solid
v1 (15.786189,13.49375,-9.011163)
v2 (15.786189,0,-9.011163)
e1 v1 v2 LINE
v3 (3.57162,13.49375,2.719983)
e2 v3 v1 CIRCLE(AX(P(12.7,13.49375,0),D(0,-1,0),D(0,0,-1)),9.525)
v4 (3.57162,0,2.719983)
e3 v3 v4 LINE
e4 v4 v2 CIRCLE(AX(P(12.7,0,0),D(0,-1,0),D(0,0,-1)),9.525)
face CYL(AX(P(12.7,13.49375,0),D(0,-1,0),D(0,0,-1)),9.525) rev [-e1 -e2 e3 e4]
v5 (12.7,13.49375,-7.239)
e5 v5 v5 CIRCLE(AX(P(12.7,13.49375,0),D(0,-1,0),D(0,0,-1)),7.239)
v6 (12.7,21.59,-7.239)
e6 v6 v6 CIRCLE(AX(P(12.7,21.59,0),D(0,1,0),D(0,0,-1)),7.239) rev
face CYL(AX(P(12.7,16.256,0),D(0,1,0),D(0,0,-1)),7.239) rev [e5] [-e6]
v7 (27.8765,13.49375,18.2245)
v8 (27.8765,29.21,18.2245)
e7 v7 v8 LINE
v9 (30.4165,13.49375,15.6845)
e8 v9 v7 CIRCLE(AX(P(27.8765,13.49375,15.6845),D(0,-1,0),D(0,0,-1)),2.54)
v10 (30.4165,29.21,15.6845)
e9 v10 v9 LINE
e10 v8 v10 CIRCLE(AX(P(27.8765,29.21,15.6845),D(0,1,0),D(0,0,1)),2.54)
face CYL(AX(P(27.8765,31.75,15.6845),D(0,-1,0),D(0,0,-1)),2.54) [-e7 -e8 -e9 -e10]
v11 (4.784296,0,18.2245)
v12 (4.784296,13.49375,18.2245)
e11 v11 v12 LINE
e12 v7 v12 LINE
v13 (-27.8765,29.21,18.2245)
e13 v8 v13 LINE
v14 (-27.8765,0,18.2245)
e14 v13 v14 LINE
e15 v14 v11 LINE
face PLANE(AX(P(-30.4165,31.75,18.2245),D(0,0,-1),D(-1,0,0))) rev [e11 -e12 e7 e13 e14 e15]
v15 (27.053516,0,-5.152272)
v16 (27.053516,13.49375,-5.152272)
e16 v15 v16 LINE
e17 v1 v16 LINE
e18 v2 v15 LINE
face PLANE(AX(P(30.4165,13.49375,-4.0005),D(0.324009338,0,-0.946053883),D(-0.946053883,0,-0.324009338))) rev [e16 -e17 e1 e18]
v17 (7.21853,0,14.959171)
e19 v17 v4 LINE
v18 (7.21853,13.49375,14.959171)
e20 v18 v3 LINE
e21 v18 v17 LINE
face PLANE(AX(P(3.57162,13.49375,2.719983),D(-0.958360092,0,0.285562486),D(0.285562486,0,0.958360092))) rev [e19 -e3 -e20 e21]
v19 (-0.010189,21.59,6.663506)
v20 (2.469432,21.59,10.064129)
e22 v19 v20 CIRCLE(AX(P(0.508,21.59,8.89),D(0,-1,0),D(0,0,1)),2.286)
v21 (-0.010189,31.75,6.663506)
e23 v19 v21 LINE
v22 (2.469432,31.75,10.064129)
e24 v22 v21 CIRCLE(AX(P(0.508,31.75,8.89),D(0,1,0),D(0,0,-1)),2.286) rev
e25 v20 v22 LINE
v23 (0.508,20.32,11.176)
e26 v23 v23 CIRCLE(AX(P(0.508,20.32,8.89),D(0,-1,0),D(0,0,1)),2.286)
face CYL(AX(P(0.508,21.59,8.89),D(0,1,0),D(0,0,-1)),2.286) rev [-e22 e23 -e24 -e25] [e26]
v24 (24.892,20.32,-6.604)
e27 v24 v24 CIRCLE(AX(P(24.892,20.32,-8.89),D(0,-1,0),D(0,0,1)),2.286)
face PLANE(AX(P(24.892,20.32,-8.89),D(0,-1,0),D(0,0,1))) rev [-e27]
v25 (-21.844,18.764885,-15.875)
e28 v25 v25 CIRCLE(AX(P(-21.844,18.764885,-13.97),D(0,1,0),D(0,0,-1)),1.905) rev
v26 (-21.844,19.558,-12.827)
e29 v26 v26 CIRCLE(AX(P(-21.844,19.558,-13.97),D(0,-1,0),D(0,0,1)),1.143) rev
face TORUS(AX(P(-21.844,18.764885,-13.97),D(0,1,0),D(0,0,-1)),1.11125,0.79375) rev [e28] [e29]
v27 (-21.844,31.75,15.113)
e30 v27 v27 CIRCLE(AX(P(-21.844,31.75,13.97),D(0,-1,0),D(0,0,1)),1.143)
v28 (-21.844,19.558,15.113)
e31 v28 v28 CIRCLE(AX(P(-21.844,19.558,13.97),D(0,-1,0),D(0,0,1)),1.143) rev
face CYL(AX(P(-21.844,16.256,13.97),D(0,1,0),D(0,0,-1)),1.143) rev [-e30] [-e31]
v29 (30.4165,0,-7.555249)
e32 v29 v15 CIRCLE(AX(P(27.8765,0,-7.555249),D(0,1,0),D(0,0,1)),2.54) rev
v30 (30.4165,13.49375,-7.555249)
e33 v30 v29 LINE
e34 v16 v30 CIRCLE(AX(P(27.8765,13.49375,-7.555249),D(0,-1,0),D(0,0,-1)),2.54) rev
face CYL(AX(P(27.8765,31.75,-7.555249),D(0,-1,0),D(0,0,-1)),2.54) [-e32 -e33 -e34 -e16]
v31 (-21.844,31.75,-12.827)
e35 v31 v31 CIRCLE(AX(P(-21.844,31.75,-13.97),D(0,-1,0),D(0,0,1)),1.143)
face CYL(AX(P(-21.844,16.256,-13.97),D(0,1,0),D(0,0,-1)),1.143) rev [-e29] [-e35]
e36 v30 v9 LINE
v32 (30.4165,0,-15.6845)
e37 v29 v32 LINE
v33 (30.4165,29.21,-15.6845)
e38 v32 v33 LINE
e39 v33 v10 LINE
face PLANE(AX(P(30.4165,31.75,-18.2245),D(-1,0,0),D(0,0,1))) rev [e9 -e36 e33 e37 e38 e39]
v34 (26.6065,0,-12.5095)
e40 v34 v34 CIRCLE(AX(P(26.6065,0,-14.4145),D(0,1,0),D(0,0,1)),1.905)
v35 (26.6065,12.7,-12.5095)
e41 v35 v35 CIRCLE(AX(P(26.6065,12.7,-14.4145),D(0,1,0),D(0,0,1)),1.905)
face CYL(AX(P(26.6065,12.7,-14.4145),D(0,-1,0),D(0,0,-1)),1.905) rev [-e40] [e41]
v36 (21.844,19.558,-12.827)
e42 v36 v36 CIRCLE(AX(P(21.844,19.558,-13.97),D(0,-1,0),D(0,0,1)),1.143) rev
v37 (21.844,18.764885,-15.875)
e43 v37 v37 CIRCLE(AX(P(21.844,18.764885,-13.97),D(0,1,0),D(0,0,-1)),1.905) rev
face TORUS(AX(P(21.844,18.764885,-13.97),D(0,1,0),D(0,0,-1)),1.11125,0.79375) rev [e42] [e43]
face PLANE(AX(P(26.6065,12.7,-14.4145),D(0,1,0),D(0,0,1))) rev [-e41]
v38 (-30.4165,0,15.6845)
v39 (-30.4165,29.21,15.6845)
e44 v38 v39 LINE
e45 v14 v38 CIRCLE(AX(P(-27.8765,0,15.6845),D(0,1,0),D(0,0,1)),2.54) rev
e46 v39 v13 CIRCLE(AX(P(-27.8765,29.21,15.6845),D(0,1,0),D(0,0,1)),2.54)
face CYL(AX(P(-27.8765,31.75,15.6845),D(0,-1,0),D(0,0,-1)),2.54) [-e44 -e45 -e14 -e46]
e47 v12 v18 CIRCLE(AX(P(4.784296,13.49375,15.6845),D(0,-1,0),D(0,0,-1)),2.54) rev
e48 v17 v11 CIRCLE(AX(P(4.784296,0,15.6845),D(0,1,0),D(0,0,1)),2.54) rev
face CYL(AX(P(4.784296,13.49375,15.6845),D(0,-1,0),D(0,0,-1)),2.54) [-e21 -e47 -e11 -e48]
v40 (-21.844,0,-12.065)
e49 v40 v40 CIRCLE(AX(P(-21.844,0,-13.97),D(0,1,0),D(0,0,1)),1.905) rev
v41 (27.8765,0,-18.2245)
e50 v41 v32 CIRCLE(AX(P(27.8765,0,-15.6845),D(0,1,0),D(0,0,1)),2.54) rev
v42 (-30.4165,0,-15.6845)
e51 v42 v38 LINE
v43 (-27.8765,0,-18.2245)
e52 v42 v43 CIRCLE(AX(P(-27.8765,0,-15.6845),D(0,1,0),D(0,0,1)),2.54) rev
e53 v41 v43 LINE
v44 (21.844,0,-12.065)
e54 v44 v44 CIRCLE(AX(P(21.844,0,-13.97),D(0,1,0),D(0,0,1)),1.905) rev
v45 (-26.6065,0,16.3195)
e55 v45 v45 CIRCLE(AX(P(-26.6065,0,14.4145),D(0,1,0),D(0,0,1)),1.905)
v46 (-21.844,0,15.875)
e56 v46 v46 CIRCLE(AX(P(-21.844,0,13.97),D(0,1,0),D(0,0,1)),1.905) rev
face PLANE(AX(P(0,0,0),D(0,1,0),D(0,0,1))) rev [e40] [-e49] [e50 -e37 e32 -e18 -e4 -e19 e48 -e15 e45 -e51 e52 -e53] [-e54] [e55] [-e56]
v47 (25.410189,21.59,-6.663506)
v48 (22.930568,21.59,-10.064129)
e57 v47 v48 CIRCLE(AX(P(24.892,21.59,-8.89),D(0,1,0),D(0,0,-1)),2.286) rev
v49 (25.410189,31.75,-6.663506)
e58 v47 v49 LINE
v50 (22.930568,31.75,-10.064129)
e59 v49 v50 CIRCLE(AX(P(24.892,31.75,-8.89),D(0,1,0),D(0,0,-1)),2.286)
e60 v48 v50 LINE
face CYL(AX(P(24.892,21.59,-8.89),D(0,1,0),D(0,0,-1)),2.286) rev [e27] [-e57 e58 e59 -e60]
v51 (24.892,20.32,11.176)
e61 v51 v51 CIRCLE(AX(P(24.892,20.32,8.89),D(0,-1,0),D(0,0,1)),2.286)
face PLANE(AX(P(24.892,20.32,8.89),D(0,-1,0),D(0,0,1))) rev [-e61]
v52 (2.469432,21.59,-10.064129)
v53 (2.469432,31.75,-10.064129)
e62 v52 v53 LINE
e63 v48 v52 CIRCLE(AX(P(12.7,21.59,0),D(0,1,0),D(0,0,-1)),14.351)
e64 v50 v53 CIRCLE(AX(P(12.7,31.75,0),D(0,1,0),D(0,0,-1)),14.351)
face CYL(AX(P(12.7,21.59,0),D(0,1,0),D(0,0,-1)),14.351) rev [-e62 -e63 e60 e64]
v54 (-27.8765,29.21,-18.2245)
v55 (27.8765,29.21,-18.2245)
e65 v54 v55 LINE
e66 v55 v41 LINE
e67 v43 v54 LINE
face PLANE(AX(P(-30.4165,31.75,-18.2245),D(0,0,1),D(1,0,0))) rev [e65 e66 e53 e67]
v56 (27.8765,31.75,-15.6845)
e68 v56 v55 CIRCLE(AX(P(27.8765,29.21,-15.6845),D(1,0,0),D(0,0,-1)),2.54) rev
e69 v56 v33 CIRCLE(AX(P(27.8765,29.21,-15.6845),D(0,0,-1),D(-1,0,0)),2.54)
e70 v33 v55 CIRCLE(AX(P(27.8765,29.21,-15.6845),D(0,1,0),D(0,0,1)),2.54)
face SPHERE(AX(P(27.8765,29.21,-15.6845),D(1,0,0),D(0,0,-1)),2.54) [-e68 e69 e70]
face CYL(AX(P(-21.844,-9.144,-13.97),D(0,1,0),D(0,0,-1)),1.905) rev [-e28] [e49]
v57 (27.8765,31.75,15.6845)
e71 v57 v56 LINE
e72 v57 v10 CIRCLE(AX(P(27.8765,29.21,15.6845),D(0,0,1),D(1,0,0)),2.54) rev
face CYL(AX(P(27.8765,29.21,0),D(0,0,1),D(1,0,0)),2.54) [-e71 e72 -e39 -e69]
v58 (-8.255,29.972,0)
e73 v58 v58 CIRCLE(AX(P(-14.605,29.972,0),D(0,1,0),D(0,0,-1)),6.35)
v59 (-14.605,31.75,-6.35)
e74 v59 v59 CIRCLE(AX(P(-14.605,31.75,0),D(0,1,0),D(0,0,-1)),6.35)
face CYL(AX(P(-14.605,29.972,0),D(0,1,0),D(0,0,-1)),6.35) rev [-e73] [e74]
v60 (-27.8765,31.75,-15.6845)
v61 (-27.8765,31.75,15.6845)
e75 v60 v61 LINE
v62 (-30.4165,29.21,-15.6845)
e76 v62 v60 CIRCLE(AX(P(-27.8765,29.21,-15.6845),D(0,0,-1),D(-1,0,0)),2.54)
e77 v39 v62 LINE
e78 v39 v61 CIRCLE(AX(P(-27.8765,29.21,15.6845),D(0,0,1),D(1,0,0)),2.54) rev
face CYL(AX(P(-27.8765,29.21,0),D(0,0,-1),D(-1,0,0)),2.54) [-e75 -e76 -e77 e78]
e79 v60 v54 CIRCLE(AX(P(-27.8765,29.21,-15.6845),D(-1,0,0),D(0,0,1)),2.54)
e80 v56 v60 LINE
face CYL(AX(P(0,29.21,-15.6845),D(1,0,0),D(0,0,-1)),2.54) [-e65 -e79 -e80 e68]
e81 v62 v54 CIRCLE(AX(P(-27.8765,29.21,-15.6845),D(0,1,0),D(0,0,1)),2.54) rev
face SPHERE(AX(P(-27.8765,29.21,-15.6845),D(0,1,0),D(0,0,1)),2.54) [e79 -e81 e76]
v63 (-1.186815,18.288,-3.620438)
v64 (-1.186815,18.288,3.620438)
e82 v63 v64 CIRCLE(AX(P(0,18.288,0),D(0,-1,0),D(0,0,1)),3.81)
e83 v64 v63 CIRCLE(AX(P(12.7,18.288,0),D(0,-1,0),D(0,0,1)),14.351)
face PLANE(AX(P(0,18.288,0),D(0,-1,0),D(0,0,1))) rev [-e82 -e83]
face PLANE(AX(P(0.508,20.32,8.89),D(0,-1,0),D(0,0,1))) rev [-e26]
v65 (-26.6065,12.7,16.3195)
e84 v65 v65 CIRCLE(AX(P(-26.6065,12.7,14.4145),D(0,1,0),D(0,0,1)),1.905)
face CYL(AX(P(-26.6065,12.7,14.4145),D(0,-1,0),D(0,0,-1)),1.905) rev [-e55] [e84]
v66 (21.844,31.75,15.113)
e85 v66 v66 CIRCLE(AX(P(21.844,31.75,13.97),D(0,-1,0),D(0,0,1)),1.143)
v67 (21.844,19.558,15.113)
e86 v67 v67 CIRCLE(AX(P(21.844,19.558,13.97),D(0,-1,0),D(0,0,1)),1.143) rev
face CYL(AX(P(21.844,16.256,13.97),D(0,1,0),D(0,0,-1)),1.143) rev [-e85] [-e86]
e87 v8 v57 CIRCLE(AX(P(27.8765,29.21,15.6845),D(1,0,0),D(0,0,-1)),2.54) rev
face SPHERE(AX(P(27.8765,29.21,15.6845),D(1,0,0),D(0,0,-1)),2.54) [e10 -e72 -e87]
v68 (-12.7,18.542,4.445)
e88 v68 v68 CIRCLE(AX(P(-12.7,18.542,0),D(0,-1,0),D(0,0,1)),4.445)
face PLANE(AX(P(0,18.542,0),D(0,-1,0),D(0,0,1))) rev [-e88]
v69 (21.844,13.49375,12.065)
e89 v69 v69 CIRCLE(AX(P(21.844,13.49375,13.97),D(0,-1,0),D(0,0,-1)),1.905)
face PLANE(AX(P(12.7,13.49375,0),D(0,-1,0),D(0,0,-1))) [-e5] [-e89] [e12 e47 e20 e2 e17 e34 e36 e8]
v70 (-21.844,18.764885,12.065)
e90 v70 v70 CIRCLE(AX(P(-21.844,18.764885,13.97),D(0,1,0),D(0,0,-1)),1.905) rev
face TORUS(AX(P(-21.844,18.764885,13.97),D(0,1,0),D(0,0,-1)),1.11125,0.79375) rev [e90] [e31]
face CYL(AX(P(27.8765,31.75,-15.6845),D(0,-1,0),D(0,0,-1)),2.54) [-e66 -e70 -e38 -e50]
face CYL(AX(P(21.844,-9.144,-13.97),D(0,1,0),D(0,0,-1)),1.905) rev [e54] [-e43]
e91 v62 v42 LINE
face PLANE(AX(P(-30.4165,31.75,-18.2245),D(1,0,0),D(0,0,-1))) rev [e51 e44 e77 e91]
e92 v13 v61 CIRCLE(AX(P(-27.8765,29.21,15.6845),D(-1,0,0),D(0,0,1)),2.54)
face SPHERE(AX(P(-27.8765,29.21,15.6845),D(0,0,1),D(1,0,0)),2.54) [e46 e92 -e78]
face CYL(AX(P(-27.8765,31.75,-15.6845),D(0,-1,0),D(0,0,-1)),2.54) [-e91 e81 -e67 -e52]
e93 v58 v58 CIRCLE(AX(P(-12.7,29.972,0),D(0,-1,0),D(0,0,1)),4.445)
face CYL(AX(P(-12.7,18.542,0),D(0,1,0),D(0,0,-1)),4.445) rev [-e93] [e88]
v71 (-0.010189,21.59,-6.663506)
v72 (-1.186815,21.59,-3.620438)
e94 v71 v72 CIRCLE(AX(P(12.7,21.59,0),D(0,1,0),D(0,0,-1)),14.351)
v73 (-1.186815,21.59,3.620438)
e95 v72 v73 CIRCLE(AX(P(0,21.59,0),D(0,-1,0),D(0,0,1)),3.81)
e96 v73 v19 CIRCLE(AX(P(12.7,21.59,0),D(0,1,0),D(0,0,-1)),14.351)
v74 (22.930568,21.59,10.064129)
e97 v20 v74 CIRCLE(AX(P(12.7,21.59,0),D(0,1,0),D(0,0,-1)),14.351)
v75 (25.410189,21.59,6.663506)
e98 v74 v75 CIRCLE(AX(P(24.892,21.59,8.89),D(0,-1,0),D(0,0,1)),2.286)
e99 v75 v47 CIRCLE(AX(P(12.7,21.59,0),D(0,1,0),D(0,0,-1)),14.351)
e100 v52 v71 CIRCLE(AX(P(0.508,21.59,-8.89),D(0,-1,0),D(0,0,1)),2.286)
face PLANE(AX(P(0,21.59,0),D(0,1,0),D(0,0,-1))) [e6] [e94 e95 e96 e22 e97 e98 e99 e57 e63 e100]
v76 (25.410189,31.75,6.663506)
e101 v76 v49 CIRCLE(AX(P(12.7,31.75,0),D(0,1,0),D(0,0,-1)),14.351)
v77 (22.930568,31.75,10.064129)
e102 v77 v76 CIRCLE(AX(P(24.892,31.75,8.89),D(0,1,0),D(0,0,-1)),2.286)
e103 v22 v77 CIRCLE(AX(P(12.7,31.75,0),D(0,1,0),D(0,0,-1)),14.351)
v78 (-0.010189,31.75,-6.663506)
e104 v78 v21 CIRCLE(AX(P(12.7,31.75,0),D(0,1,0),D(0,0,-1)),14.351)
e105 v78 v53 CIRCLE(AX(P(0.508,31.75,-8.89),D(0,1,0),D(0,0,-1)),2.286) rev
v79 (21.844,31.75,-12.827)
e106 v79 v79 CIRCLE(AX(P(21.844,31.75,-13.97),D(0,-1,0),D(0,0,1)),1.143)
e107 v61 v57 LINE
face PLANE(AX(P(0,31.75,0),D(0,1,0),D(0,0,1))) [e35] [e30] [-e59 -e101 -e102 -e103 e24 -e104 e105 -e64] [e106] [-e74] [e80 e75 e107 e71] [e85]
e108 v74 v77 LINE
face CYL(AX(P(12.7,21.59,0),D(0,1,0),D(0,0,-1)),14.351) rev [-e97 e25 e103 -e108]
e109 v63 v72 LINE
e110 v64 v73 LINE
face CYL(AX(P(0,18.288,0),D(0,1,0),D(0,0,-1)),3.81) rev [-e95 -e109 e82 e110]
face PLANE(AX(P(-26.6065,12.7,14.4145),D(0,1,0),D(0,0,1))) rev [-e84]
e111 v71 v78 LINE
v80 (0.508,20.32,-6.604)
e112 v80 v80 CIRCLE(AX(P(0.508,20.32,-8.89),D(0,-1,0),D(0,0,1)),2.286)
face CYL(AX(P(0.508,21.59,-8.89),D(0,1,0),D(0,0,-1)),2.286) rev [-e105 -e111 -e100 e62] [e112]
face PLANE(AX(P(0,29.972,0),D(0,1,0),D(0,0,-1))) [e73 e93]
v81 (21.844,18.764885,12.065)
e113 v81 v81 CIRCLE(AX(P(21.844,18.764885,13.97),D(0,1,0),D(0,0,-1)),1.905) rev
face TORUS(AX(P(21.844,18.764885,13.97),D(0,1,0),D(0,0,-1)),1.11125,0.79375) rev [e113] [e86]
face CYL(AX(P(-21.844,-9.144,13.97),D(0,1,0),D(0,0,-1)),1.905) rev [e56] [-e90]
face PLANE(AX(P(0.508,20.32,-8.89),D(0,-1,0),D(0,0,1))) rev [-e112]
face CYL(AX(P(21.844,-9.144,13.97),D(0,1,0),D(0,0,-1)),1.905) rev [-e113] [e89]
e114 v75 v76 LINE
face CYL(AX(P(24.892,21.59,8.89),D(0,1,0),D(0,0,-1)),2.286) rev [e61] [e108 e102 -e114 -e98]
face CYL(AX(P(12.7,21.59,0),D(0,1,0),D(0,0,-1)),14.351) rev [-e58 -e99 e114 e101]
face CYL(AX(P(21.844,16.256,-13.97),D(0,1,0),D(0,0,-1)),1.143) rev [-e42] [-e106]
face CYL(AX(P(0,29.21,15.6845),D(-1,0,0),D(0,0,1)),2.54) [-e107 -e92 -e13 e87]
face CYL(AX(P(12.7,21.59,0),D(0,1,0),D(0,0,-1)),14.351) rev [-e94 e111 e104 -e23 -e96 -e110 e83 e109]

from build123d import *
from build123d.topology import SkipClean

# Parameters (mm, degrees)
SKETCH2_W           = 60.833
SKETCH2_H           = 36.449
BOSS_EXTRUDE1_DEPTH = 31.75
CAVITY1_START       = 21.59
CAVITY1_OUTLINE_R   = 4.445
CAVITY1_DEPTH       = 10.16
CAVITY1_START_2     = 16.256
CAVITY1_2_OUTLINE_R = 7.239
CAVITY1_2_DEPTH     = 5.334
CAVITY1_START_3     = 18.542
CAVITY1_3_OUTLINE_R = 4.445
CAVITY1_3_DEPTH     = 3.048
CAVITY1_START_4     = 29.972
CAVITY1_4_DEPTH     = 1.778
CAVITY1_START_5     = 20.32
CAVITY1_5_OUTLINE_R = 2.286
CAVITY1_5_DEPTH     = 1.27
CAVITY1_START_6     = 18.288
CAVITY1_6_DEPTH     = 0.254
CUT_EXTRUDE1_DEPTH  = 13.49375
SKETCH4_R           = 7.239
CUT_EXTRUDE2_DEPTH  = 40.007094336
SKETCH5_R           = 1.905
CUT_EXTRUDE3_DEPTH  = 12.7
FILLET1_R           = 2.54


# Read off the part's stored shape, not the designer's step: Cavity1
with BuildPart() as part:
    # Sketch2 → Boss-Extrude1 (new body)
    with BuildSketch(Plane(origin=(0, 0, 0), x_dir=(1, 0, 0), z_dir=(0, 1, 0))):
        Rectangle(SKETCH2_W, SKETCH2_H)
    extrude(amount=BOSS_EXTRUDE1_DEPTH)

    # Cavity1 outline → Cavity1 (cut)
    with BuildSketch(Plane(origin=(0, 0, 0), x_dir=(1, 0, 0), z_dir=(0, 1, 0)).offset(CAVITY1_START)):
        with BuildLine():
            ThreePointArc((-0.010188518, 6.663505747), (-1.651, 0), (-0.010188518, -6.663505747))
            ThreePointArc((-0.010188518, -6.663505747), (-1.339105214, -10.236847552), (2.469432496, -10.064128852))
            ThreePointArc((2.469432496, -10.064128852), (12.7, -14.351), (22.930567504, -10.064128852))
            ThreePointArc((22.930567504, -10.064128852), (26.739105214, -10.236847552), (25.410188518, -6.663505747))
            ThreePointArc((25.410188518, -6.663505747), (27.051, 0), (25.410188518, 6.663505747))
            ThreePointArc((25.410188518, 6.663505747), (26.739105214, 10.236847552), (22.930567504, 10.064128852))
            ThreePointArc((22.930567504, 10.064128852), (12.7, 14.351), (2.469432496, 10.064128852))
            ThreePointArc((2.469432496, 10.064128852), (-1.339105214, 10.236847552), (-0.010188518, 6.663505747))
        make_face()
        with Locations((-12.7, 0)):
            Circle(CAVITY1_OUTLINE_R)
    extrude(amount=CAVITY1_DEPTH, mode=Mode.SUBTRACT)

    # Cavity1 2 outline → Cavity1 2 (cut)
    with BuildSketch(Plane(origin=(0, 0, 0), x_dir=(1, 0, 0), z_dir=(0, 1, 0)).offset(CAVITY1_START_2)):
        with Locations((12.7, 0)):
            Circle(CAVITY1_2_OUTLINE_R)
    extrude(amount=CAVITY1_2_DEPTH, mode=Mode.SUBTRACT)

    # Cavity1 3 outline → Cavity1 3 (cut)
    with BuildSketch(Plane(origin=(0, 0, 0), x_dir=(1, 0, 0), z_dir=(0, 1, 0)).offset(CAVITY1_START_3)):
        with BuildLine():
            ThreePointArc((-1.186815, 3.62043784), (-1.651, 0), (-1.186815, -3.62043784))
            ThreePointArc((-1.186815, -3.62043784), (3.81, 0), (-1.186815, 3.62043784))
        make_face()
        with Locations((-12.7, 0)):
            Circle(CAVITY1_3_OUTLINE_R)
    extrude(amount=CAVITY1_3_DEPTH, mode=Mode.SUBTRACT)

    # Cavity1 4 outline → Cavity1 4 (cut)
    with BuildSketch(Plane(origin=(0, 0, 0), x_dir=(1, 0, 0), z_dir=(0, 1, 0)).offset(CAVITY1_START_4)):
        with BuildLine():
            Line((-8.432941907, -1.245086436), (-8.381648336, -1.261900971))
            ThreePointArc((-8.381648336, -1.261900971), (-8.34804351, -1.083049158), (-8.319577582, -0.903307825))
            Line((-8.319577582, -0.903307825), (-8.355488936, -0.939813075))
            ThreePointArc((-8.355488936, -0.939813075), (-8.391510846, -1.093135951), (-8.432941907, -1.245086436))
        make_face()
        with BuildLine():
            ThreePointArc((-13.598725967, -6.269761763), (-10.20766679, -4.581043619), (-8.381648336, -1.261900971))
            Line((-8.381648336, -1.261900971), (-8.432941907, -1.245086436))
            ThreePointArc((-8.432941907, -1.245086436), (-9.643662496, -3.227510815), (-11.689058668, -4.32851275))
            Line((-11.689058668, -4.32851275), (-13.598725967, -6.269761763))
        make_face()
        with BuildLine():
            Line((-8.432941907, 1.245086436), (-8.381648336, 1.261900971))
            ThreePointArc((-8.381648336, 1.261900971), (-10.20766679, 4.581043619), (-13.598725967, 6.269761763))
            Line((-13.598725967, 6.269761763), (-11.689058668, 4.32851275))
            ThreePointArc((-11.689058668, 4.32851275), (-9.643662496, 3.227510815), (-8.432941907, 1.245086436))
        make_face()
        with BuildLine():
            ThreePointArc((-8.319577582, 0.903307825), (-8.34804351, 1.083049158), (-8.381648336, 1.261900971))
            Line((-8.381648336, 1.261900971), (-8.432941907, 1.245086436))
            ThreePointArc((-8.432941907, 1.245086436), (-8.391510846, 1.093135951), (-8.355488936, 0.939813075))
            Line((-8.355488936, 0.939813075), (-8.319577582, 0.903307825))
        make_face()
        with BuildLine():
            ThreePointArc((-20.367669641, -2.667234262), (-17.588349777, -5.605544051), (-13.598725967, -6.269761763))
            Line((-13.598725967, -6.269761763), (-11.689058668, -4.32851275))
            ThreePointArc((-11.689058668, -4.32851275), (-14.8148806, -3.909642573), (-16.876068942, -1.522653339))
            Line((-16.876068942, -1.522653339), (-20.367669641, -2.667234262))
        make_face()
        with BuildLine():
            Line((-8.355488936, -0.939813075), (-8.319577582, -0.903307825))
            ThreePointArc((-8.319577582, -0.903307825), (-8.271164971, -0.452806607), (-8.255, 0))
            ThreePointArc((-8.255, 0), (-8.280193631, -0.472585083), (-8.355488936, -0.939813075))
        make_face()
        with BuildLine():
            ThreePointArc((-8.255, 0), (-8.271164971, 0.452806607), (-8.319577582, 0.903307825))
            Line((-8.319577582, 0.903307825), (-8.355488936, 0.939813075))
            ThreePointArc((-8.355488936, 0.939813075), (-8.280193631, 0.472585083), (-8.255, 0))
        make_face()
        with BuildLine():
            Line((-11.689058668, 4.32851275), (-13.598725967, 6.269761763))
            ThreePointArc((-13.598725967, 6.269761763), (-17.588349777, 5.605544051), (-20.367669641, 2.667234262))
            Line((-20.367669641, 2.667234262), (-16.876068942, 1.522653339))
            ThreePointArc((-16.876068942, 1.522653339), (-14.8148806, 3.909642573), (-11.689058668, 4.32851275))
        make_face()
        with BuildLine():
            ThreePointArc((-20.367669641, 2.667234262), (-20.955, 0), (-20.367669641, -2.667234262))
            Line((-20.367669641, -2.667234262), (-16.876068942, -1.522653339))
            ThreePointArc((-16.876068942, -1.522653339), (-17.145, 0), (-16.876068942, 1.522653339))
            Line((-16.876068942, 1.522653339), (-20.367669641, 2.667234262))
        make_face()
    extrude(amount=CAVITY1_4_DEPTH, mode=Mode.SUBTRACT)

    # Cavity1 5 outline → Cavity1 5 (cut)
    with BuildSketch(Plane(origin=(0, 0, 0), x_dir=(1, 0, 0), z_dir=(0, 1, 0)).offset(CAVITY1_START_5)):
        with Locations((0.508, -8.89)):
            Circle(CAVITY1_5_OUTLINE_R)
        with Locations((0.508, 8.89)):
            Circle(CAVITY1_5_OUTLINE_R)
        with Locations((24.892, -8.89)):
            Circle(CAVITY1_5_OUTLINE_R)
        with Locations((24.892, 8.89)):
            Circle(CAVITY1_5_OUTLINE_R)
    extrude(amount=CAVITY1_5_DEPTH, mode=Mode.SUBTRACT)

    # Cavity1 6 outline → Cavity1 6 (cut)
    with BuildSketch(Plane(origin=(0, 0, 0), x_dir=(1, 0, 0), z_dir=(0, 1, 0)).offset(CAVITY1_START_6)):
        with BuildLine():
            ThreePointArc((-1.186815, 3.62043784), (-1.651, 0), (-1.186815, -3.62043784))
            ThreePointArc((-1.186815, -3.62043784), (3.81, 0), (-1.186815, 3.62043784))
        make_face()
    extrude(amount=CAVITY1_6_DEPTH, mode=Mode.SUBTRACT)

    # Cavity1 7 outline → Cavity1 7 (revolve, cut)
    with BuildSketch(Plane(origin=(21.844, 0, -13.97), x_dir=(1, 0, 0), z_dir=(0, 0, 1))):
        with BuildLine():
            Line((0, 0), (1.905, 0))
            Line((1.905, 0), (1.905, 18.764885254))
            ThreePointArc((1.905, 18.764885254), (1.683631265, 19.314811386), (1.143, 19.558))
            Line((1.143, 19.558), (1.143, 31.75))
            Line((1.143, 31.75), (0, 31.75))
            Line((0, 31.75), (0, 0))
        make_face()
    revolve(axis=Axis((21.844, 0, -13.97), (0, 1, 0)), mode=Mode.SUBTRACT)

    # Cavity1 8 outline → Cavity1 8 (revolve, cut)
    with BuildSketch(Plane(origin=(21.844, 0, 13.97), x_dir=(1, 0, 0), z_dir=(0, 0, 1))):
        with BuildLine():
            Line((0, 0), (1.905, 0))
            Line((1.905, 0), (1.905, 18.764885254))
            ThreePointArc((1.905, 18.764885254), (1.683631265, 19.314811386), (1.143, 19.558))
            Line((1.143, 19.558), (1.143, 31.75))
            Line((1.143, 31.75), (0, 31.75))
            Line((0, 31.75), (0, 0))
        make_face()
    revolve(axis=Axis((21.844, 0, 13.97), (0, 1, 0)), mode=Mode.SUBTRACT)

    # Cavity1 9 outline → Cavity1 9 (revolve, cut)
    with BuildSketch(Plane(origin=(-21.844, 0, 13.97), x_dir=(1, 0, 0), z_dir=(0, 0, 1))):
        with BuildLine():
            Line((0, 0), (1.905, 0))
            Line((1.905, 0), (1.905, 18.764885254))
            ThreePointArc((1.905, 18.764885254), (1.683631265, 19.314811386), (1.143, 19.558))
            Line((1.143, 19.558), (1.143, 31.75))
            Line((1.143, 31.75), (0, 31.75))
            Line((0, 31.75), (0, 0))
        make_face()
    revolve(axis=Axis((-21.844, 0, 13.97), (0, 1, 0)), mode=Mode.SUBTRACT)

    # Cavity1 10 outline → Cavity1 10 (revolve, cut)
    with BuildSketch(Plane(origin=(-21.844, 0, -13.97), x_dir=(1, 0, 0), z_dir=(0, 0, 1))):
        with BuildLine():
            Line((0, 0), (1.905, 0))
            Line((1.905, 0), (1.905, 18.764885254))
            ThreePointArc((1.905, 18.764885254), (1.683631265, 19.314811386), (1.143, 19.558))
            Line((1.143, 19.558), (1.143, 31.75))
            Line((1.143, 31.75), (0, 31.75))
            Line((0, 31.75), (0, 0))
        make_face()
    revolve(axis=Axis((-21.844, 0, -13.97), (0, 1, 0)), mode=Mode.SUBTRACT)

    # Sketch3 → Cut-Extrude1 (cut)
    with BuildSketch(Plane.XZ):
        with BuildLine():
            Line((3.57162012, 2.719982678), (8.1915, 18.2245))
            Line((8.1915, 18.2245), (30.4165, 18.2245))
            Line((30.4165, 18.2245), (30.4165, -4.0005))
            Line((30.4165, -4.0005), (15.786188948, -9.011163231))
            ThreePointArc((15.786188948, -9.011163231), (6.102124289, -6.869764268), (3.57162012, 2.719982678))
        make_face()
    extrude(amount=-CUT_EXTRUDE1_DEPTH, mode=Mode.SUBTRACT)

    # Sketch4 → Cut-Extrude2 (cut, through all)
    with SkipClean():  # the faces are left unmerged after this step: merging them gives an invalid solid
        with BuildSketch(Plane(origin=(0, 16.256, 0), x_dir=(1, 0, 0), z_dir=(0, 1, 0))):
            with Locations(Location((12.7, 0, 0), (0, 0, 90))):
                Circle(SKETCH4_R)
        extrude(amount=-CUT_EXTRUDE2_DEPTH, mode=Mode.SUBTRACT)

    # Sketch5 → Cut-Extrude3 (cut)
    with SkipClean():  # the faces are left unmerged after this step: merging them gives an invalid solid
        with BuildSketch(Plane(origin=(0, 0, 0), x_dir=(1, 0, 0), z_dir=(0, 1, 0))):
            with Locations(Location((26.6065, 14.4145, 0), (0, 0, 270))):
                Circle(SKETCH5_R)
            with Locations(Location((-26.6065, -14.4145, 0), (0, 0, 270))):
                Circle(SKETCH5_R)
        extrude(amount=CUT_EXTRUDE3_DEPTH, mode=Mode.SUBTRACT)

    # Fillet1
    fillet1_edges = [part.edges().sort_by_distance(p)[0] for p in [
        (-30.4165, 31.75, 0),
        (0, 31.75, 18.2245),
        (30.4165, 6.746875, -4.0005),
        (8.1915, 6.746875, 18.2245),
        (30.4165, 31.75, 0),
        (30.4165, 22.621875, 18.2245),
        (-30.4165, 15.875, 18.2245),
        (-30.4165, 15.875, -18.2245),
        (30.4165, 15.875, -18.2245),
        (0, 31.75, -18.2245),
    ]]
    fillet(fillet1_edges, radius=FILLET1_R)


solid = part.part
